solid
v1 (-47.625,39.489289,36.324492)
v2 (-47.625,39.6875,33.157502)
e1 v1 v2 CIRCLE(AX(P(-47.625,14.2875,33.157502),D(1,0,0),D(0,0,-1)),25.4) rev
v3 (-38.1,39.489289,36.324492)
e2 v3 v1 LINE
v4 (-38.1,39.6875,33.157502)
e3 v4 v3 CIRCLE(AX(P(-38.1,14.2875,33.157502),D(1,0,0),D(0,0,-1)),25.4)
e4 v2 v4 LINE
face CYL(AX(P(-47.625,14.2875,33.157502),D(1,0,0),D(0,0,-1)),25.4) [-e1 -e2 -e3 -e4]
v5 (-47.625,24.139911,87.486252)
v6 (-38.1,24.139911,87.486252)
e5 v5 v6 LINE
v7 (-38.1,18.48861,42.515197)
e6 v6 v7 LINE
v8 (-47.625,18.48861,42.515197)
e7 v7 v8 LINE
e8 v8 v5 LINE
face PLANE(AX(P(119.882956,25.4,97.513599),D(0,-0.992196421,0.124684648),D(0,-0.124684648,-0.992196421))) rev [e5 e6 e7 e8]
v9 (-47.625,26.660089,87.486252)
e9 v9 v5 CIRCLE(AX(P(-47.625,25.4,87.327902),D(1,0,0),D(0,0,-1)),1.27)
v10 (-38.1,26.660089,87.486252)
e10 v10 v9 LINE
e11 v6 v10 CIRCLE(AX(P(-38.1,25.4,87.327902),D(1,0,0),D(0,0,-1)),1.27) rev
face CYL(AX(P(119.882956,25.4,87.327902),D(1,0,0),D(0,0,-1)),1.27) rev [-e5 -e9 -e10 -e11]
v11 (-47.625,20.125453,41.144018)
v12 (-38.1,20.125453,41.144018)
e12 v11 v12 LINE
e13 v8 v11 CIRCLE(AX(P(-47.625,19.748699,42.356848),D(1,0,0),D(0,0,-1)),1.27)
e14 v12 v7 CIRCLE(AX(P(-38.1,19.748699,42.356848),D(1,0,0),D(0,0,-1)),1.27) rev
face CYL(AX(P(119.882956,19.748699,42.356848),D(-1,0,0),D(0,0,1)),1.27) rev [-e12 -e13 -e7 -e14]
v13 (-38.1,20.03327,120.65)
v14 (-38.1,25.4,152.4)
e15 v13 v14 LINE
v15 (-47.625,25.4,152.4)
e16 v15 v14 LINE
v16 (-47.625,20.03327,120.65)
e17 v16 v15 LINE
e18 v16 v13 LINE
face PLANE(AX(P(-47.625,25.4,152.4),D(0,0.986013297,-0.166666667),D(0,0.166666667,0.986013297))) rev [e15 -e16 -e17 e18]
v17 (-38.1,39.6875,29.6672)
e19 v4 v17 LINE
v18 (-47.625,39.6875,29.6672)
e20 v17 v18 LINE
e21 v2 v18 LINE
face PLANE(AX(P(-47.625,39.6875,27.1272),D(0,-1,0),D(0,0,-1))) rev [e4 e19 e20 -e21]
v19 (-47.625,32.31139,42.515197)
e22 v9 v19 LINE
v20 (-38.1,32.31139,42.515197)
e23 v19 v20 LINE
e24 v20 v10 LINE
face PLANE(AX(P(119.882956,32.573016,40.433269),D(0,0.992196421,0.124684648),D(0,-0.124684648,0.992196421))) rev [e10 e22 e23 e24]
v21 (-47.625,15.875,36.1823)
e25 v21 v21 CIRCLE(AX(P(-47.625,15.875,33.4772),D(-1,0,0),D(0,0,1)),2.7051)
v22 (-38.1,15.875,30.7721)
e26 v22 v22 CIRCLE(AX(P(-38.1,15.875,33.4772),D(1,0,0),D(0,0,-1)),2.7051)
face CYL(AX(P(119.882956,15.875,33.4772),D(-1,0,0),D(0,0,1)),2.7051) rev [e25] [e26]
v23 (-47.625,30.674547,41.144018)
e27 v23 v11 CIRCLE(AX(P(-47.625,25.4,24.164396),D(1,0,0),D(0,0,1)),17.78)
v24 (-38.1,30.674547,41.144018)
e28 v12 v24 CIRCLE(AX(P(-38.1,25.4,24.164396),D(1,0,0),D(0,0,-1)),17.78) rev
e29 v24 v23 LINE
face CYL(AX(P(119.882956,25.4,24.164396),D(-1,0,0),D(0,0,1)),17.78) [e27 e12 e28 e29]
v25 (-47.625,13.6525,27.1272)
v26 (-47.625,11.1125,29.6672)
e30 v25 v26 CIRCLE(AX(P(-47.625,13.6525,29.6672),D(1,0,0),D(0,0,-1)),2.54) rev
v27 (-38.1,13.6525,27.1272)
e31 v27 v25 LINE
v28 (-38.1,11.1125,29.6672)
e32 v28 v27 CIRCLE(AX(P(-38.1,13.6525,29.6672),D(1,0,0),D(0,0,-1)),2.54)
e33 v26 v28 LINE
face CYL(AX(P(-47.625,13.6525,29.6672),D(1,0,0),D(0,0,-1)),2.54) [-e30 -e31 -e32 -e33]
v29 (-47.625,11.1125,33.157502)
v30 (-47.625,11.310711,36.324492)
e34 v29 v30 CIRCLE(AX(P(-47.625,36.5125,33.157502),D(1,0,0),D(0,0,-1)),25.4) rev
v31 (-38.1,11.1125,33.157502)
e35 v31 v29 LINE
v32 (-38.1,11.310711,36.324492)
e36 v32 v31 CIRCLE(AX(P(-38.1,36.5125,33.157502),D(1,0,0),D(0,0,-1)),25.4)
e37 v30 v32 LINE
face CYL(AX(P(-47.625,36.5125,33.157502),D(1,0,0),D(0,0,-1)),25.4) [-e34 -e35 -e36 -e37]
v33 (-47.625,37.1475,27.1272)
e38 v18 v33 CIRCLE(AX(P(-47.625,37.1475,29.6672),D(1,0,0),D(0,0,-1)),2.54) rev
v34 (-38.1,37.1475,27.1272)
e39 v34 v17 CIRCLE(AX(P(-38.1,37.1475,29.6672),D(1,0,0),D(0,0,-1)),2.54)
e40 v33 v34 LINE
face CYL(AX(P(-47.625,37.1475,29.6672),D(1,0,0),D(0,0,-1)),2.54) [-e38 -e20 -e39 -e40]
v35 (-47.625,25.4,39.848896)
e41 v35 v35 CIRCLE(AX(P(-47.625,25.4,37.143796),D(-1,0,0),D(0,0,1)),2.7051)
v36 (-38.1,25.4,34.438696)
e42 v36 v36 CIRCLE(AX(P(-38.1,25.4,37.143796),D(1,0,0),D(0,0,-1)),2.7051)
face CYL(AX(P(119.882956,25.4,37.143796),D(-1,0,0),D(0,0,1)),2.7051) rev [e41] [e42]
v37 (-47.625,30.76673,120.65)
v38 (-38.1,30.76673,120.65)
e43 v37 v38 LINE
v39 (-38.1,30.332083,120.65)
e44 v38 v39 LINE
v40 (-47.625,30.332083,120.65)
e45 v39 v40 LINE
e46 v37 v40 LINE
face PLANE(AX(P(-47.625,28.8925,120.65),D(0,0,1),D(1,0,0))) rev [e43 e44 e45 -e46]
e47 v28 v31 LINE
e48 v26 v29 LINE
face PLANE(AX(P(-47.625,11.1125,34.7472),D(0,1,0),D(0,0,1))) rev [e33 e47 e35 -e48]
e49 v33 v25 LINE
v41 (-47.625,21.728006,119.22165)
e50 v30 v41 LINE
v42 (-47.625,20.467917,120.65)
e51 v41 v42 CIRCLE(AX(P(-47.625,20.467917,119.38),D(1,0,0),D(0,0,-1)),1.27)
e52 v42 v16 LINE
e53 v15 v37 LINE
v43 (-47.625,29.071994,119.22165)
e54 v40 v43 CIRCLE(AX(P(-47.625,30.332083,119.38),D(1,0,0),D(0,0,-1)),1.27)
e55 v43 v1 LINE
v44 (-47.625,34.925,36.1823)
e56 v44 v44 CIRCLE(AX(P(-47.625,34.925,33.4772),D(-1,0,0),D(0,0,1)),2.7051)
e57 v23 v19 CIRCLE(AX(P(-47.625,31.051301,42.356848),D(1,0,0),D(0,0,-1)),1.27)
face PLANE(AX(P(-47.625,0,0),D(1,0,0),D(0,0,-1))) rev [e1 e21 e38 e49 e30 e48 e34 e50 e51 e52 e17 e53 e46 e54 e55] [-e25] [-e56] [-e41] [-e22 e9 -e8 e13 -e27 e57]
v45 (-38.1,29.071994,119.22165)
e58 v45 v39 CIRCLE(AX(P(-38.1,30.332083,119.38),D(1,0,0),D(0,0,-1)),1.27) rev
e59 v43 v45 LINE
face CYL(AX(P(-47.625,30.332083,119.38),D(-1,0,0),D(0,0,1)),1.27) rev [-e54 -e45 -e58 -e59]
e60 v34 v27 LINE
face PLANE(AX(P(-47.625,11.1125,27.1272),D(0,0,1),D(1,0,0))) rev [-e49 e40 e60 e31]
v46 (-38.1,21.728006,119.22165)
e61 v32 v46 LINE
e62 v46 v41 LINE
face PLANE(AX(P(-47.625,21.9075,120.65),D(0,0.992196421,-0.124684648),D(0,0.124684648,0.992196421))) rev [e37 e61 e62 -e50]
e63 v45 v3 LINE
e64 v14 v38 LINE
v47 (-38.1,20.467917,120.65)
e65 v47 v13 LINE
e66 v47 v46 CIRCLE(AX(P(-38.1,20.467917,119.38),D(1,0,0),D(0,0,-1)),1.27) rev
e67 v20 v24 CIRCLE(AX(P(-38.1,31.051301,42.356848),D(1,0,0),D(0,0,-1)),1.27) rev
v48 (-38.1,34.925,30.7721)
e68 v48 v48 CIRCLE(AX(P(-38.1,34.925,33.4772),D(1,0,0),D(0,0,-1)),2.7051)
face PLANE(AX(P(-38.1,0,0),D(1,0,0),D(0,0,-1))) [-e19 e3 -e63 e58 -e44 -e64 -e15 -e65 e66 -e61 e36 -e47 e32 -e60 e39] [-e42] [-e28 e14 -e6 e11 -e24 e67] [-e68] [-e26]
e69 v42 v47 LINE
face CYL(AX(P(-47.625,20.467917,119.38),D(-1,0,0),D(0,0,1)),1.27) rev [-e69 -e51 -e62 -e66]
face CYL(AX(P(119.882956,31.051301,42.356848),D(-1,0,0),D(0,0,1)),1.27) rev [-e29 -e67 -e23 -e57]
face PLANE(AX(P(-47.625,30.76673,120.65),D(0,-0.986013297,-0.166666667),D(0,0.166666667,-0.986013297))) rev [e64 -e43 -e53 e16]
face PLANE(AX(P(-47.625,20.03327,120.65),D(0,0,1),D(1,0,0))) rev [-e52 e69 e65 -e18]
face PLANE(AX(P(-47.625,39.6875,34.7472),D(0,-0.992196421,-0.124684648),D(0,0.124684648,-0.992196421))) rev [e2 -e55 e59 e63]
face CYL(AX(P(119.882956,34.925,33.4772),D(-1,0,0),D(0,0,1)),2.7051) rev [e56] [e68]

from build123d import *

# Parameters (mm, degrees)
STOCK_BUMBLE_START            = -47.625
STOCK_BUMBLE_BYTE_1_OUTLINE_R = 2.7051
STOCK_BUMBLE_BYTE_1_DEPTH     = 9.525
FILLET1_R                     = 2.54
FILLET2_R                     = 1.27
FILLET3_R                     = 1.27
FILLET4_R                     = 25.4


# Read off the part's stored shape, not the designer's step: Stock-Bumble Byte-1
with BuildPart() as part:
    # Stock-Bumble Byte-1 outline → Stock-Bumble Byte-1 (new body)
    with BuildSketch(Plane.YZ.offset(STOCK_BUMBLE_START)):
        Polygon((21.9075, 120.65), (11.1125, 34.7472), (11.1125, 27.1272), (39.6875, 27.1272), (39.6875, 34.7472), (28.8925, 120.65), (30.766729518, 120.65), (25.4, 152.4), (20.033270482, 120.65), align=None)
        with Locations((15.875, 33.4772)):
            Circle(STOCK_BUMBLE_BYTE_1_OUTLINE_R, mode=Mode.SUBTRACT)
        with Locations((25.4, 37.143795847)):
            Circle(STOCK_BUMBLE_BYTE_1_OUTLINE_R, mode=Mode.SUBTRACT)
        with Locations((34.925, 33.4772)):
            Circle(STOCK_BUMBLE_BYTE_1_OUTLINE_R, mode=Mode.SUBTRACT)
        with BuildLine():
            ThreePointArc((32.573016025, 40.433269228), (25.4, 41.944395847), (18.226983975, 40.433269228))
            Line((18.226983975, 40.433269228), (25.4, 97.513599106))
            Line((25.4, 97.513599106), (32.573016025, 40.433269228))
        make_face(mode=Mode.SUBTRACT)
    extrude(amount=STOCK_BUMBLE_BYTE_1_DEPTH)

    # Fillet1
    fillet1_edges = [part.edges().sort_by_distance(p)[0] for p in [
        (-42.8625, 11.1125, 27.1272),
        (-42.8625, 39.6875, 27.1272),
    ]]
    fillet(fillet1_edges, radius=FILLET1_R)

    # Fillet2
    fillet2_edges = [part.edges().sort_by_distance(p)[0] for p in [
        (-42.8625, 18.226983975, 40.433269228),
        (-42.8625, 32.573016025, 40.433269228),
        (-42.8625, 25.4, 97.513599106),
    ]]
    fillet(fillet2_edges, radius=FILLET2_R)

    # Fillet3
    fillet3_edges = [part.edges().sort_by_distance(p)[0] for p in [
        (-42.8625, 28.8925, 120.65),
        (-42.8625, 21.9075, 120.65),
    ]]
    fillet(fillet3_edges, radius=FILLET3_R)

    # Fillet4
    fillet4_edges = [part.edges().sort_by_distance(p)[0] for p in [
        (-42.8625, 11.1125, 34.7472),
        (-42.8625, 39.6875, 34.7472),
    ]]
    fillet(fillet4_edges, radius=FILLET4_R)


solid = part.part
